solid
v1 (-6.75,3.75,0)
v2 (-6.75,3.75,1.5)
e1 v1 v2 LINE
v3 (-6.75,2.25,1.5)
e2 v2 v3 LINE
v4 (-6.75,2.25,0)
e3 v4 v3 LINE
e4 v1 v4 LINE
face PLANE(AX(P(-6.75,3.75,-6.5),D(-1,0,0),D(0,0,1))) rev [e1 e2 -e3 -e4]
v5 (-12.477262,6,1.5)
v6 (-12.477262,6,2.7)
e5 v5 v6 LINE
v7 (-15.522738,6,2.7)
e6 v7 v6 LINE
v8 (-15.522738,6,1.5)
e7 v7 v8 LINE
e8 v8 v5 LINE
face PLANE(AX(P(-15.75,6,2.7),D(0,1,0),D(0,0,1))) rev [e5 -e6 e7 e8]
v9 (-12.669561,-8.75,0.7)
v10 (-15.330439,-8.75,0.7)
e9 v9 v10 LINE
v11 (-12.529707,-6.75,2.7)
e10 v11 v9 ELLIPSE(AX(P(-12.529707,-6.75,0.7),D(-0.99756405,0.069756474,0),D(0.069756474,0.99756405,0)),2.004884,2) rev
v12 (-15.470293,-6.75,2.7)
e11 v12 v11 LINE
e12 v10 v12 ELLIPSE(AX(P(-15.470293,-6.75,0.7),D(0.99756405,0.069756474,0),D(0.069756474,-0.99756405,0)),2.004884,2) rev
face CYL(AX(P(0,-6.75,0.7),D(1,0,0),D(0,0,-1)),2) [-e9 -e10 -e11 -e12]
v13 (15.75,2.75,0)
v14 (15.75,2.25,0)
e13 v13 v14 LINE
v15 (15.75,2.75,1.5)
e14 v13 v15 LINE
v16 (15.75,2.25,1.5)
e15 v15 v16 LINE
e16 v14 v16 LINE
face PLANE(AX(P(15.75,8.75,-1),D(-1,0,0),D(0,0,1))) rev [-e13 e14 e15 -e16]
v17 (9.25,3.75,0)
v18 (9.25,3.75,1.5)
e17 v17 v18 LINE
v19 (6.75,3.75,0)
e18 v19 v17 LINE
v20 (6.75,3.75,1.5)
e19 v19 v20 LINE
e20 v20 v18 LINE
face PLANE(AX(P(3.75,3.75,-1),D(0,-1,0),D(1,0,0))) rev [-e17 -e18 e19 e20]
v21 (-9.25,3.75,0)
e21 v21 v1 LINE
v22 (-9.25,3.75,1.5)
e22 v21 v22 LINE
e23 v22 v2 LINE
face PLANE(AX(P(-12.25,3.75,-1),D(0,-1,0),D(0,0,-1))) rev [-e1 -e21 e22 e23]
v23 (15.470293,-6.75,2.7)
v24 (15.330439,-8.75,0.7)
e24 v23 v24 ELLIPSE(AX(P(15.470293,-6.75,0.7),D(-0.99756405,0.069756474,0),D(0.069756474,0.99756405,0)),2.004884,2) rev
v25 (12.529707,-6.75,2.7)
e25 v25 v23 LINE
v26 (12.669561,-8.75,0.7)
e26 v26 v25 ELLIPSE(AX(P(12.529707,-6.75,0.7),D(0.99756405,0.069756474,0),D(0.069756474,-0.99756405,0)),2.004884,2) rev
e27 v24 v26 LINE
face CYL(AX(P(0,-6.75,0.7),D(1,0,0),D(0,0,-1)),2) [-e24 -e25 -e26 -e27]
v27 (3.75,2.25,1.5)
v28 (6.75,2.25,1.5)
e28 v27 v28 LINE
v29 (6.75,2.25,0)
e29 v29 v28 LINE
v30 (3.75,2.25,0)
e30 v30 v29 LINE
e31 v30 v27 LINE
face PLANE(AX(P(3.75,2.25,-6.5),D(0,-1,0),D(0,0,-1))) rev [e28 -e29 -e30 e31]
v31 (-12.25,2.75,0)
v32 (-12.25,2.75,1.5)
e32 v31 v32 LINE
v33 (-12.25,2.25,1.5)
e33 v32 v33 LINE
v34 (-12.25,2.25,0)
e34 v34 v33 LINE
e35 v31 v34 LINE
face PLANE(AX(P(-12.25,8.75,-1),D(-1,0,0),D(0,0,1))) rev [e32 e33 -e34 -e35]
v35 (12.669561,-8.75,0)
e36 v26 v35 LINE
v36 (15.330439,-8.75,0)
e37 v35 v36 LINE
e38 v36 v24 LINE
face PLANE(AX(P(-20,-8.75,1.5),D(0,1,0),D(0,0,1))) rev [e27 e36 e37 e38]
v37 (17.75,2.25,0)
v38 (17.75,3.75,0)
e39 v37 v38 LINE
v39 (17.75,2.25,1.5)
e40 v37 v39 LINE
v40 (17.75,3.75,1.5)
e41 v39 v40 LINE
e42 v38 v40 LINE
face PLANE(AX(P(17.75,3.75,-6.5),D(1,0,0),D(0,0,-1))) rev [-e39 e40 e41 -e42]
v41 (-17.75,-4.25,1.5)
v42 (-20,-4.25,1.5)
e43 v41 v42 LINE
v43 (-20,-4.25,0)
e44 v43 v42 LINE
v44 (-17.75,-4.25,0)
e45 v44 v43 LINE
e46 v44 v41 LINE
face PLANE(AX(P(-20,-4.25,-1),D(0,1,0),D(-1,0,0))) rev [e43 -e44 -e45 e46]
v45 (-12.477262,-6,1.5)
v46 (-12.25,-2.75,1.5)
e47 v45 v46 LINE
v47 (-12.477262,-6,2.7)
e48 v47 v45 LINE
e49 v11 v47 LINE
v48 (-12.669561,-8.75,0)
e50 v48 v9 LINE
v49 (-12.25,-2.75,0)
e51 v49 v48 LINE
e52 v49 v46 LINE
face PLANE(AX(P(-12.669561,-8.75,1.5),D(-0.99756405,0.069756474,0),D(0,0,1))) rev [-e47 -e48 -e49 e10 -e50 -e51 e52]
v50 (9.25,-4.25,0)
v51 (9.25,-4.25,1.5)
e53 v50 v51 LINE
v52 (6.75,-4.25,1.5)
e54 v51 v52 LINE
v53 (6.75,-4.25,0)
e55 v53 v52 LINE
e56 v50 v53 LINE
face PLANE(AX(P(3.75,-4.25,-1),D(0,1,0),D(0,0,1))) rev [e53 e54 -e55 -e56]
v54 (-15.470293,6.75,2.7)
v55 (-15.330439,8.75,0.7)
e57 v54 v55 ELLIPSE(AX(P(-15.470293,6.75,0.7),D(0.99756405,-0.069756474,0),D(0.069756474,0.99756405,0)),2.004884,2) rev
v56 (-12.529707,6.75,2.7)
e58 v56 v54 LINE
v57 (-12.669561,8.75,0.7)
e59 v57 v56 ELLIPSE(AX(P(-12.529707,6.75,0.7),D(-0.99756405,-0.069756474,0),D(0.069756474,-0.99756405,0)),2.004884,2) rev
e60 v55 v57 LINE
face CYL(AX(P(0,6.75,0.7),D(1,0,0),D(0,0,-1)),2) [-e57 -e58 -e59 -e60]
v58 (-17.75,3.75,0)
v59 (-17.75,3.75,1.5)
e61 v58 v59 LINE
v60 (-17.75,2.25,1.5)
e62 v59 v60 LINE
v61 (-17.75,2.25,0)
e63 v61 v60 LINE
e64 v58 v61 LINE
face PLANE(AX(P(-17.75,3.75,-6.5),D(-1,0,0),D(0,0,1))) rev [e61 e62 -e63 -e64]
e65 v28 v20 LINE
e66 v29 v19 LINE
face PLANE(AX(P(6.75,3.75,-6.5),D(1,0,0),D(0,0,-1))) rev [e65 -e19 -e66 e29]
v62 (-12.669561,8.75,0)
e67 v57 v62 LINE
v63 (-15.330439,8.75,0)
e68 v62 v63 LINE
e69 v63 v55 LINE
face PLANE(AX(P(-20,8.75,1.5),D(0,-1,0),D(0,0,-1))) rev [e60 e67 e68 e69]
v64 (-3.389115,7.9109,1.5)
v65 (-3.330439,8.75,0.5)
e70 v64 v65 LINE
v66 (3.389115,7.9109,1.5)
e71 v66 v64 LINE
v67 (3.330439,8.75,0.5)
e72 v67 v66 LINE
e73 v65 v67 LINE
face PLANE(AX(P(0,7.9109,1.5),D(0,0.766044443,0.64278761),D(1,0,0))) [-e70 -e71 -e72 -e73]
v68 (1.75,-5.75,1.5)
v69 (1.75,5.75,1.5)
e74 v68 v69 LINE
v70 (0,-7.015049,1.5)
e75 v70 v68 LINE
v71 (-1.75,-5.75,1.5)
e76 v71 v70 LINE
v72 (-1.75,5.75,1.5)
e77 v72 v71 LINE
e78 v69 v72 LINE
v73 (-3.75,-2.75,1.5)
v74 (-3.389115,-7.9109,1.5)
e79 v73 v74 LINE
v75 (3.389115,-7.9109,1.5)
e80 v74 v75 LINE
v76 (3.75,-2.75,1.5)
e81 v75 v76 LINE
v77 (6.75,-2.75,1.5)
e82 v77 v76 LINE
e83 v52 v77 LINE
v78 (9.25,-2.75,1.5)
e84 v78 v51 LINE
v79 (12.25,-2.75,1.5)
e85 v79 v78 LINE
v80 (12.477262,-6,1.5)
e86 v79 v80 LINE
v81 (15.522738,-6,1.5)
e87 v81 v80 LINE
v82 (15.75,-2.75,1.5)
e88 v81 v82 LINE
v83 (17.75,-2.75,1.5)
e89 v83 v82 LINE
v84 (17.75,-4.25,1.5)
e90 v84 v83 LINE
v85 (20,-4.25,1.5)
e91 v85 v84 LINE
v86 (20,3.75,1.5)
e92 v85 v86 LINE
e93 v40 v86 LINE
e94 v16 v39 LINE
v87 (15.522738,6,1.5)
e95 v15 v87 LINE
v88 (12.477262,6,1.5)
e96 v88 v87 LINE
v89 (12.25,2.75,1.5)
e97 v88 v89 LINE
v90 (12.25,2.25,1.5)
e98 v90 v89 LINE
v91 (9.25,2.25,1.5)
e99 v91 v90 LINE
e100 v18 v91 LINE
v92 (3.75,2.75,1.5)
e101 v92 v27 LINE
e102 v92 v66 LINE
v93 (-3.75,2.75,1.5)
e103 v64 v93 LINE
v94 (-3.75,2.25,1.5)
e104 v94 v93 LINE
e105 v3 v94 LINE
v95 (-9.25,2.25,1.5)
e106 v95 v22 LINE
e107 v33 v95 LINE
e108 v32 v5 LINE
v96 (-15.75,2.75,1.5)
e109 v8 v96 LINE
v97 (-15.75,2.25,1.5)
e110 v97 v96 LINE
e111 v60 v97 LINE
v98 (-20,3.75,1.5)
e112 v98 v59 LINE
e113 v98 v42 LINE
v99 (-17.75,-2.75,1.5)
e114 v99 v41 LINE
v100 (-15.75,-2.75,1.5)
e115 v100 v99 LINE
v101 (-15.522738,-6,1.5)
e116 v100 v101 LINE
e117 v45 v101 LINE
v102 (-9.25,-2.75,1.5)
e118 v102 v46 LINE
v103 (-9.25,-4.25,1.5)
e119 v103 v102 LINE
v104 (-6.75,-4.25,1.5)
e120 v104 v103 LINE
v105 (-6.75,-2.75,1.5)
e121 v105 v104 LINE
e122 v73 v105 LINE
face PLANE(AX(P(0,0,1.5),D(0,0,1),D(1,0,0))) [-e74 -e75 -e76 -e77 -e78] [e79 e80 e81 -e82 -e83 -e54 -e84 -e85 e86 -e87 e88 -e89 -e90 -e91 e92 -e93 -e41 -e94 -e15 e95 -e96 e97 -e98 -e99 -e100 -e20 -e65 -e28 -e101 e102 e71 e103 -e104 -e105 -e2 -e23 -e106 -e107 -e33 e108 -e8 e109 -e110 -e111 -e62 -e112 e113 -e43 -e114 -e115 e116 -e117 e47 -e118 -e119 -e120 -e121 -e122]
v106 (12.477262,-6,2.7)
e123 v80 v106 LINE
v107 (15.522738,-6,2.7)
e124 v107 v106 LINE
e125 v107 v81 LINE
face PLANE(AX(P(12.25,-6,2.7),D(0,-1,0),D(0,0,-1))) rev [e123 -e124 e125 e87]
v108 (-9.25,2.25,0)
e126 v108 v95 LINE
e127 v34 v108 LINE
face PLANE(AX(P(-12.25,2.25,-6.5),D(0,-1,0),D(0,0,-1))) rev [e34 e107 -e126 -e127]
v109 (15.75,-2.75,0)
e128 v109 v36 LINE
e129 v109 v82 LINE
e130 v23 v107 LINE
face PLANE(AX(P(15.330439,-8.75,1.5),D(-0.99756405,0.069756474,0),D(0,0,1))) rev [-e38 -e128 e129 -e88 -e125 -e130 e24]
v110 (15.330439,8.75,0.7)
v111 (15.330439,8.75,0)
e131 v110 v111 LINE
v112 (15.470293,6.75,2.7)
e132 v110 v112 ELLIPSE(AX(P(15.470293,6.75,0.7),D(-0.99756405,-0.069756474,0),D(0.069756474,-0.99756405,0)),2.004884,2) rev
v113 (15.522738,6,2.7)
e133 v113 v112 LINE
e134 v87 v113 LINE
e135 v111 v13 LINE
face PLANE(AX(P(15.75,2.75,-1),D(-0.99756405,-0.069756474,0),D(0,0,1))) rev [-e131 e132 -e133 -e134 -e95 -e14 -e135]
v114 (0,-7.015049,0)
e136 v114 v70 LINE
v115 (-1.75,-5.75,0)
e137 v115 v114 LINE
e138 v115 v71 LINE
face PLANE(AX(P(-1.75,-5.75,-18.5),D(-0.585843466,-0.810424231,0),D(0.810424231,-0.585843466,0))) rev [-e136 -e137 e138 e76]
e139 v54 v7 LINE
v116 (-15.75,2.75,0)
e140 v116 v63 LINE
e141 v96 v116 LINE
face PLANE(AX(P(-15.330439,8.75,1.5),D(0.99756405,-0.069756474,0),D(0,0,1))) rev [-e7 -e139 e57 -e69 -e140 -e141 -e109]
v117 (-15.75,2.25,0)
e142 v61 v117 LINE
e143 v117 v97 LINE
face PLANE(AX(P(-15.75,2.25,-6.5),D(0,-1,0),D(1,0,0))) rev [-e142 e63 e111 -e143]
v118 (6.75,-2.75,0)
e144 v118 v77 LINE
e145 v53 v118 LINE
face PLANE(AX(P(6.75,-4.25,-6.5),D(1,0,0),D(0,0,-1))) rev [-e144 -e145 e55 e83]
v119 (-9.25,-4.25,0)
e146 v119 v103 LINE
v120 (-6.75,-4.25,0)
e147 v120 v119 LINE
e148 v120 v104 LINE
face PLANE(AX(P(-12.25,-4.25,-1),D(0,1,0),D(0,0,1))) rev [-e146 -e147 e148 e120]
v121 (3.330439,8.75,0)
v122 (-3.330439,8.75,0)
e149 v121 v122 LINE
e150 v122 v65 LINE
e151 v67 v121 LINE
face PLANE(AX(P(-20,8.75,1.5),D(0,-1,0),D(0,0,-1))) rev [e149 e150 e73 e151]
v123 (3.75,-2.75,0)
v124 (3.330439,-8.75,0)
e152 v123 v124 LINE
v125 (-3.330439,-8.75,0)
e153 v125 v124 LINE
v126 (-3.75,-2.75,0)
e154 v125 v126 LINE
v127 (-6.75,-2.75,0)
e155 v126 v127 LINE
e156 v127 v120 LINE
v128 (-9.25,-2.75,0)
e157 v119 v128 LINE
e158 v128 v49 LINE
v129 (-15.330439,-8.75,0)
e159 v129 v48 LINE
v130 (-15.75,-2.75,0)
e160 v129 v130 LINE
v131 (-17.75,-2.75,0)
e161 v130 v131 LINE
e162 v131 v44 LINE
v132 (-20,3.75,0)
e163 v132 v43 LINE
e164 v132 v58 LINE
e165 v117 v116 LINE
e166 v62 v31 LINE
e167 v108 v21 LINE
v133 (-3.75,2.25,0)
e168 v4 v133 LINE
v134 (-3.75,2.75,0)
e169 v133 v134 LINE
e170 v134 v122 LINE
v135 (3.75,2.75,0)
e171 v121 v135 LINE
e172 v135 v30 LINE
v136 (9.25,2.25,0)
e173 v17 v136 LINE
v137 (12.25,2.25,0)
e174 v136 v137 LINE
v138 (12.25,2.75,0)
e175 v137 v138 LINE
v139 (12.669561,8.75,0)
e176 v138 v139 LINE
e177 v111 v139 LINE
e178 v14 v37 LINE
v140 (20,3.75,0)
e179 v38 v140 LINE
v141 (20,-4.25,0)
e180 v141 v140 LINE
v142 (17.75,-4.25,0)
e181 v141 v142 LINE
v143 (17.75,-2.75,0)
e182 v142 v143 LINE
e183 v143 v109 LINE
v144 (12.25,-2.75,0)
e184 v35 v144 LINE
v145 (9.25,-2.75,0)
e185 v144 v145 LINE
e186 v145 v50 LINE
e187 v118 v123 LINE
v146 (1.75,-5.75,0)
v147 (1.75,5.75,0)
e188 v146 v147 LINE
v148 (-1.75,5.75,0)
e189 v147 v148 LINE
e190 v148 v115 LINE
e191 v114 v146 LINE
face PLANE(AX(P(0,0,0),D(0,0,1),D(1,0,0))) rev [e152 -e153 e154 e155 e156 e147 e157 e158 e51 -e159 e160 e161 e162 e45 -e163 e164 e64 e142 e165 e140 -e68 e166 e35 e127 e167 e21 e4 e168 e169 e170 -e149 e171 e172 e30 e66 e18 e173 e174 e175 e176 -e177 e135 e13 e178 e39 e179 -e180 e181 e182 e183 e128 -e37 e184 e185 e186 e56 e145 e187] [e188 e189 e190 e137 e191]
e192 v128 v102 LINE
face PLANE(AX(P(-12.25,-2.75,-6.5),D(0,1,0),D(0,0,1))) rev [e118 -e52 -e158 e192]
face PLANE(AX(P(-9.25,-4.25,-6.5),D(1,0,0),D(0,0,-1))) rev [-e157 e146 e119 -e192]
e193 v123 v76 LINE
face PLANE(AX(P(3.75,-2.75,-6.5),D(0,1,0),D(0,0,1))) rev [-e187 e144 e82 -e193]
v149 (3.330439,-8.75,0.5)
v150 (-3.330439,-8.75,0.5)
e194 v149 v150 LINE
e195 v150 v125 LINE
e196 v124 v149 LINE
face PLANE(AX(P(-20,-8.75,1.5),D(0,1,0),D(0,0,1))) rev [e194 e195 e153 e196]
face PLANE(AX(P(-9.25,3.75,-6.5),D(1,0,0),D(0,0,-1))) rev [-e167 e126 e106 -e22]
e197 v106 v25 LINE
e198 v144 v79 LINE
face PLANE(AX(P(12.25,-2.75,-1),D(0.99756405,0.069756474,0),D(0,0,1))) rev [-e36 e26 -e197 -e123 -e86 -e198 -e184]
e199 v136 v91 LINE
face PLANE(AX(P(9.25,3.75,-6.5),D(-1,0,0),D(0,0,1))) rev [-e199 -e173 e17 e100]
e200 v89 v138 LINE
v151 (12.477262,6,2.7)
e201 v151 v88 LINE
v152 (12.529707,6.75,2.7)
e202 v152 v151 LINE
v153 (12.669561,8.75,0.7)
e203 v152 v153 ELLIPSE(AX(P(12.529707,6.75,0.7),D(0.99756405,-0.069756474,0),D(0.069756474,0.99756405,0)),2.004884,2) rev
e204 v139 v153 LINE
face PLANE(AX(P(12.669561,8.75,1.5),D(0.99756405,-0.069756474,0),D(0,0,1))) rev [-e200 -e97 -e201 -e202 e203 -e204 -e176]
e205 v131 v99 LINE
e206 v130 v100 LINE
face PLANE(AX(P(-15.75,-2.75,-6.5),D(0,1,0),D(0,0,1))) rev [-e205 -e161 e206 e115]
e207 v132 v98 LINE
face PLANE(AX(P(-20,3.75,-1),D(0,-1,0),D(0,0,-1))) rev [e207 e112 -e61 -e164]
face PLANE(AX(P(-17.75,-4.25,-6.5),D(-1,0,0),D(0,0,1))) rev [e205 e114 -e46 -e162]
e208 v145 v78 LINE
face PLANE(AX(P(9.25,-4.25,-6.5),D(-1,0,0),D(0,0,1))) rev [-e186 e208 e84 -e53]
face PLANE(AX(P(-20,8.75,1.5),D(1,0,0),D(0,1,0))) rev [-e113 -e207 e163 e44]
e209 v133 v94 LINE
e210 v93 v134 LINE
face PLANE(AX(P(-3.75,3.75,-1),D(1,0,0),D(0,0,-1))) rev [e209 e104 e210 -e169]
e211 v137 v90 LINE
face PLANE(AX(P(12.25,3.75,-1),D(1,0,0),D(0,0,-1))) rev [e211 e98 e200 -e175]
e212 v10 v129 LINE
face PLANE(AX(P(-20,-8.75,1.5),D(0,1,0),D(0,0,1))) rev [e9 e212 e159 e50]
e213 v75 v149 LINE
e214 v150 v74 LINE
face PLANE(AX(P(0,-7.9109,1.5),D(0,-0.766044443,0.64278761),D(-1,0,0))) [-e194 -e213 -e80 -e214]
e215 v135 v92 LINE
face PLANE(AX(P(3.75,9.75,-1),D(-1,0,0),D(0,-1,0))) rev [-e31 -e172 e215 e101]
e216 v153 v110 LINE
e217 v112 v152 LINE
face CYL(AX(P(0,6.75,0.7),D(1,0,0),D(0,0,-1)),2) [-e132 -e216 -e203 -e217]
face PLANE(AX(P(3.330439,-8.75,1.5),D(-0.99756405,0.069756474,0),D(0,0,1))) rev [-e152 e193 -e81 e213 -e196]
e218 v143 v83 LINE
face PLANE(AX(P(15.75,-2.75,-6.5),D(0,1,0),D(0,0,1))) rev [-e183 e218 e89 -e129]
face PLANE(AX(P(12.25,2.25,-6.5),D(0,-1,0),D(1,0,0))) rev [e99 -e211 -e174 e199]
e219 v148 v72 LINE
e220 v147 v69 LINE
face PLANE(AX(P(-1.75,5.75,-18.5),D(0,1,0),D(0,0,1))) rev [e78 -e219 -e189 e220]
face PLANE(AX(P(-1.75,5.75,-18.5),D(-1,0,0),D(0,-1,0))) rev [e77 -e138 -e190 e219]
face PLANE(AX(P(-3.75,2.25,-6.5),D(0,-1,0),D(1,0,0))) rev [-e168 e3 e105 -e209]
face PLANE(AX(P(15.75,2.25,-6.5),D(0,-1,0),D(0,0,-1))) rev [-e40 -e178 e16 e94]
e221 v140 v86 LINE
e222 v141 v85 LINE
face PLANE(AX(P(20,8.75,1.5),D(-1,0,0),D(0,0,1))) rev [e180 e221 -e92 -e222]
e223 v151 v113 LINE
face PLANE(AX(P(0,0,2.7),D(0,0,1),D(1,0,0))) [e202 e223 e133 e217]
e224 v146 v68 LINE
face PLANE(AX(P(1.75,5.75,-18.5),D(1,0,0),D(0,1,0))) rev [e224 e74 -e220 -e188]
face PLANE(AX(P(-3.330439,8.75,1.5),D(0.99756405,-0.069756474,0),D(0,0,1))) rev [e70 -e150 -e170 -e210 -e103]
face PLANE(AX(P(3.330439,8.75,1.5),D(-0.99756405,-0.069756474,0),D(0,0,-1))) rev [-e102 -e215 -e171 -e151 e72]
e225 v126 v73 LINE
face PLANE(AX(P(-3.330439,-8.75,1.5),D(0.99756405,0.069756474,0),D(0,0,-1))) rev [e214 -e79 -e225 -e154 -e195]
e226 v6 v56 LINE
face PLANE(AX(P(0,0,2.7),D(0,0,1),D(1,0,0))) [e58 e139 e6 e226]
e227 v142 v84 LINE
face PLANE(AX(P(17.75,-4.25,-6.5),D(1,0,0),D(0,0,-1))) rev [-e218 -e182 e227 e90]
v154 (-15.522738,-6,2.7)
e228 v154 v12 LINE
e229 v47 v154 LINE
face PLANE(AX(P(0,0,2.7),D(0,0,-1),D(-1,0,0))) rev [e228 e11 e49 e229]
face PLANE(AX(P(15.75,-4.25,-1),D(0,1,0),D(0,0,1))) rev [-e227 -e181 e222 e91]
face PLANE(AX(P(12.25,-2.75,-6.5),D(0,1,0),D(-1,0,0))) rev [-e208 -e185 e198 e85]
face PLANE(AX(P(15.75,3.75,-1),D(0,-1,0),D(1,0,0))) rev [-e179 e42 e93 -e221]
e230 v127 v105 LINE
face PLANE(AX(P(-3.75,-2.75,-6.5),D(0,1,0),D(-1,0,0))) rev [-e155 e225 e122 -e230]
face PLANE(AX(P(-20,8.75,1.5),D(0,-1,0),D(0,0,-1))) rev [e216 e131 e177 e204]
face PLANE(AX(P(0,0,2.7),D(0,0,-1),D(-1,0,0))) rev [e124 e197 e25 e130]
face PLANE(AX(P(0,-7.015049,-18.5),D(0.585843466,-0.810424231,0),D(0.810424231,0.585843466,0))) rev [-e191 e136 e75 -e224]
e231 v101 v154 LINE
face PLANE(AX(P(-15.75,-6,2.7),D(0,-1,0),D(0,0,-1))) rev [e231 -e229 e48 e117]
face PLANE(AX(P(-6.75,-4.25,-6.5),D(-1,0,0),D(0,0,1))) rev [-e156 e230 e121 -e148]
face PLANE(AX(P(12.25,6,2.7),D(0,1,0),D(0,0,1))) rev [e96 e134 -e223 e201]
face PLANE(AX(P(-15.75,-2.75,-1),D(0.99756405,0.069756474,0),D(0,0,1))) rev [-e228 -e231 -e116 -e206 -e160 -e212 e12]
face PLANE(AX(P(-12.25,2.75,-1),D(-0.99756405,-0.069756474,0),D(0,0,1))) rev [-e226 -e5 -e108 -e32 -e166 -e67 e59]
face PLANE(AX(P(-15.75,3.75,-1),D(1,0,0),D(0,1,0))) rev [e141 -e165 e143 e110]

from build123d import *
from OCP.BRepFilletAPI import BRepFilletAPI_MakeChamfer

# Parameters (mm, degrees)
ESBO_O10_W               = 40
ESBO_O10_H               = 17.5
RESSALTO_EXTRUS_O6_DEPTH = 1.5
CORTE_EXTRUS_O2_DEPTH    = 2.5
ESBO_O12_W               = 3.5
ESBO_O12_H               = 2.75
RESSALTO_EXTRUS_O7_DEPTH = 1.2
ESBO_O13_W               = 3
ESBO_O13_H               = 1.5
ESBO_O13_W_2             = 2
CORTE_EXTRUS_O3_DEPTH    = 8
CORTE_EXTRUS_O4_DEPTH    = 20
CHANFRO5_SIZE            = 6
CHANFRO5_SIZE_2          = 0.419560872
CHANFRO6_SIZE            = 1
CHANFRO6_SIZE2           = 0.839099631
FILETE1_R                = 2


with BuildPart() as part:
    # Esboço10 → Ressalto-extrusão6 (new body)
    with BuildSketch(Plane.XY):
        Rectangle(ESBO_O10_W, ESBO_O10_H)
    extrude(amount=RESSALTO_EXTRUS_O6_DEPTH)

    # Esboço11 → Corte-extrusão2 (cut)
    with BuildSketch(Plane.XY.offset(1.5)):
        Polygon((-20, 3.75), (-15.75, 3.75), (-15.75, 8.75), (-12.25, 8.75), (-12.25, 3.75), (-3.75, 3.75), (-3.75, 9.75), (3.75, 9.75), (3.75, 3.75), (12.25, 3.75), (12.25, 8.75), (15.75, 8.75), (15.75, 3.75), (20, 3.75), (20, 11.902365005), (-20, 11.902365005), align=None)
        Polygon((-20, -4.25), (-15.75, -4.25), (-15.75, -8.75), (-12.25, -8.75), (-12.25, -4.25), (-3.75, -4.25), (-3.75, -10.25), (3.75, -9.74672567), (3.75, -4.25), (12.25, -4.25), (12.25, -8.75), (15.75, -8.75), (15.75, -4.25), (20, -4.25), (20, -11.31917021), (-20, -11.31917021), align=None)
    extrude(amount=-CORTE_EXTRUS_O2_DEPTH, mode=Mode.SUBTRACT)

    # Esboço12 → Ressalto-extrusão7 (add)
    with BuildSketch(Plane.XY.offset(1.5)):
        with Locations((-14, 7.375)):
            Rectangle(ESBO_O12_W, ESBO_O12_H)
        with Locations((-14, -7.375)):
            Rectangle(ESBO_O12_W, ESBO_O12_H)
        with Locations((14, -7.375)):
            Rectangle(ESBO_O12_W, ESBO_O12_H)
        with Locations((14, 7.375)):
            Rectangle(ESBO_O12_W, ESBO_O12_H)
    extrude(amount=RESSALTO_EXTRUS_O7_DEPTH)

    # Esboço13 → Corte-extrusão3 (cut)
    with BuildSketch(Plane.XY.offset(1.5)):
        with Locations((-10.75, 3)):
            Rectangle(ESBO_O13_W, ESBO_O13_H)
        with Locations((-5.25, 3)):
            Rectangle(ESBO_O13_W, ESBO_O13_H)
        with Locations((5.25, 3)):
            Rectangle(ESBO_O13_W, ESBO_O13_H)
        with Locations((10.75, 3)):
            Rectangle(ESBO_O13_W, ESBO_O13_H)
        with Locations((10.75, -3.5)):
            Rectangle(ESBO_O13_W, ESBO_O13_H)
        with Locations((5.25, -3.5)):
            Rectangle(ESBO_O13_W, ESBO_O13_H)
        with Locations((-5.25, -3.5)):
            Rectangle(ESBO_O13_W, ESBO_O13_H)
        with Locations((-10.75, -3.5)):
            Rectangle(ESBO_O13_W, ESBO_O13_H)
        with Locations((-16.75, -3.5)):
            Rectangle(ESBO_O13_W_2, ESBO_O13_H)
        with Locations((-16.75, 3)):
            Rectangle(ESBO_O13_W_2, ESBO_O13_H)
        with Locations((16.75, 3)):
            Rectangle(ESBO_O13_W_2, ESBO_O13_H)
        with Locations((16.75, -3.5)):
            Rectangle(ESBO_O13_W_2, ESBO_O13_H)
    extrude(amount=-CORTE_EXTRUS_O3_DEPTH, mode=Mode.SUBTRACT)

    # Esboço15 → Corte-extrusão4 (cut)
    with BuildSketch(Plane.XY.offset(1.5)):
        Polygon((-1.75, 5.75), (1.75, 5.75), (1.75, -5.75), (0, -7.015048633), (-1.75, -5.75), align=None)
    extrude(amount=-CORTE_EXTRUS_O4_DEPTH, mode=Mode.SUBTRACT)

    # Chanfro5
    chanfro5_edges_1 = [part.edges().sort_by_distance(p)[0] for p in [
        (-15.75, -8.75, 1.35),
    ]]
    chanfro5_side_1 = [part.faces().sort_by_distance(p)[0] for p in [
        (-15.75, -8.741608783, 1.35),
    ]]
    chanfro5_edges_2 = [part.edges().sort_by_distance(p)[0] for p in [
        (-3.75, -8.75, 0.75),
    ]]
    chanfro5_side_2 = [part.faces().sort_by_distance(p)[0] for p in [
        (-3.75, -8.741608783, 0.75),
    ]]
    chanfro5_edges_3 = [part.edges().sort_by_distance(p)[0] for p in [
        (12.25, -8.75, 1.35),
    ]]
    chanfro5_side_3 = [part.faces().sort_by_distance(p)[0] for p in [
        (12.25, -8.741608783, 1.35),
    ]]
    chanfro5_edges_4 = [part.edges().sort_by_distance(p)[0] for p in [
        (15.75, 8.75, 1.35),
    ]]
    chanfro5_side_4 = [part.faces().sort_by_distance(p)[0] for p in [
        (15.741608783, 8.75, 1.35),
    ]]
    chanfro5_edges_5 = [part.edges().sort_by_distance(p)[0] for p in [
        (3.75, 8.75, 0.75),
    ]]
    chanfro5_side_5 = [part.faces().sort_by_distance(p)[0] for p in [
        (3.741608783, 8.75, 0.75),
    ]]
    chanfro5_edges_6 = [part.edges().sort_by_distance(p)[0] for p in [
        (-12.25, 8.75, 1.35),
    ]]
    chanfro5_side_6 = [part.faces().sort_by_distance(p)[0] for p in [
        (-12.258391217, 8.75, 1.35),
    ]]
    chanfro5_edges_7 = [part.edges().sort_by_distance(p)[0] for p in [
        (-12.25, -8.75, 1.35),
    ]]
    chanfro5_side_7 = [part.faces().sort_by_distance(p)[0] for p in [
        (-12.258391217, -8.75, 1.35),
    ]]
    chanfro5_edges_8 = [part.edges().sort_by_distance(p)[0] for p in [
        (3.75, -8.75, 0.75),
    ]]
    chanfro5_side_8 = [part.faces().sort_by_distance(p)[0] for p in [
        (3.741608783, -8.75, 0.75),
    ]]
    chanfro5_edges_9 = [part.edges().sort_by_distance(p)[0] for p in [
        (15.75, -8.75, 1.35),
    ]]
    chanfro5_side_9 = [part.faces().sort_by_distance(p)[0] for p in [
        (15.741608783, -8.75, 1.35),
    ]]
    chanfro5_edges_10 = [part.edges().sort_by_distance(p)[0] for p in [
        (12.25, 8.75, 1.35),
    ]]
    chanfro5_side_10 = [part.faces().sort_by_distance(p)[0] for p in [
        (12.25, 8.741608783, 1.35),
    ]]
    chanfro5_edges_11 = [part.edges().sort_by_distance(p)[0] for p in [
        (-3.75, 8.75, 0.75),
    ]]
    chanfro5_side_11 = [part.faces().sort_by_distance(p)[0] for p in [
        (-3.75, 8.741608783, 0.75),
    ]]
    chanfro5_edges_12 = [part.edges().sort_by_distance(p)[0] for p in [
        (-15.75, 8.75, 1.35),
    ]]
    chanfro5_side_12 = [part.faces().sort_by_distance(p)[0] for p in [
        (-15.741608783, 8.75, 1.35),
    ]]
    chanfro5 = BRepFilletAPI_MakeChamfer(part.part.solid().wrapped)
    for e in chanfro5_edges_1:
        chanfro5.Add(CHANFRO5_SIZE - 0.0001, CHANFRO5_SIZE_2 - 0.0001, e.wrapped, chanfro5_side_1[0].wrapped)
    for e in chanfro5_edges_2:
        chanfro5.Add(CHANFRO5_SIZE - 0.0001, CHANFRO5_SIZE_2 - 0.0001, e.wrapped, chanfro5_side_2[0].wrapped)
    for e in chanfro5_edges_3:
        chanfro5.Add(CHANFRO5_SIZE - 0.0001, CHANFRO5_SIZE_2 - 0.0001, e.wrapped, chanfro5_side_3[0].wrapped)
    for e in chanfro5_edges_4:
        chanfro5.Add(CHANFRO5_SIZE_2 - 0.0001, CHANFRO5_SIZE - 0.0001, e.wrapped, chanfro5_side_4[0].wrapped)
    for e in chanfro5_edges_5:
        chanfro5.Add(CHANFRO5_SIZE_2 - 0.0001, CHANFRO5_SIZE - 0.0001, e.wrapped, chanfro5_side_5[0].wrapped)
    for e in chanfro5_edges_6:
        chanfro5.Add(CHANFRO5_SIZE_2 - 0.0001, CHANFRO5_SIZE - 0.0001, e.wrapped, chanfro5_side_6[0].wrapped)
    for e in chanfro5_edges_7:
        chanfro5.Add(CHANFRO5_SIZE_2 - 0.0001, CHANFRO5_SIZE - 0.0001, e.wrapped, chanfro5_side_7[0].wrapped)
    for e in chanfro5_edges_8:
        chanfro5.Add(CHANFRO5_SIZE_2 - 0.0001, CHANFRO5_SIZE - 0.0001, e.wrapped, chanfro5_side_8[0].wrapped)
    for e in chanfro5_edges_9:
        chanfro5.Add(CHANFRO5_SIZE_2 - 0.0001, CHANFRO5_SIZE - 0.0001, e.wrapped, chanfro5_side_9[0].wrapped)
    for e in chanfro5_edges_10:
        chanfro5.Add(CHANFRO5_SIZE - 0.0001, CHANFRO5_SIZE_2 - 0.0001, e.wrapped, chanfro5_side_10[0].wrapped)
    for e in chanfro5_edges_11:
        chanfro5.Add(CHANFRO5_SIZE - 0.0001, CHANFRO5_SIZE_2 - 0.0001, e.wrapped, chanfro5_side_11[0].wrapped)
    for e in chanfro5_edges_12:
        chanfro5.Add(CHANFRO5_SIZE_2 - 0.0001, CHANFRO5_SIZE - 0.0001, e.wrapped, chanfro5_side_12[0].wrapped)
    add(Compound.cast(chanfro5.Shape()), mode=Mode.REPLACE)  # a hair under: the kernel refuses the full size

    # Chanfro6: one chamfer whose edges measure the first distance from different faces: ONE call of the kernel's chamfer builder (chamfer() names one face for all edges)
    chanfro6_edges_1 = [part.edges().sort_by_distance(p)[0] for p in [
        (0, -8.75, 1.5),
    ]]
    chanfro6_side_1 = [part.faces().sort_by_distance(p)[0] for p in [
        (0, -8.75, 0.75),
    ]]
    chanfro6_edges_2 = [part.edges().sort_by_distance(p)[0] for p in [
        (0, 8.75, 1.5),
    ]]
    chanfro6_side_2 = [part.faces().sort_by_distance(p)[0] for p in [
        (0, 8.75, 0.75),
    ]]
    chanfro6 = BRepFilletAPI_MakeChamfer(part.part.solid().wrapped)
    for e in chanfro6_edges_1:
        chanfro6.Add(CHANFRO6_SIZE, CHANFRO6_SIZE2, e.wrapped, chanfro6_side_1[0].wrapped)  # the first distance lies on this face
    for e in chanfro6_edges_2:
        chanfro6.Add(CHANFRO6_SIZE, CHANFRO6_SIZE2, e.wrapped, chanfro6_side_2[0].wrapped)  # the first distance lies on this face
    add(Compound.cast(chanfro6.Shape()), mode=Mode.REPLACE)

    # Filete1
    filete1_edges = [part.edges().sort_by_distance(p)[0] for p in [
        (-14, -8.75, 2.7),
        (14, -8.75, 2.7),
        (14, 8.75, 2.7),
        (-14, 8.75, 2.7),
    ]]
    fillet(filete1_edges, radius=FILETE1_R)


solid = part.part
